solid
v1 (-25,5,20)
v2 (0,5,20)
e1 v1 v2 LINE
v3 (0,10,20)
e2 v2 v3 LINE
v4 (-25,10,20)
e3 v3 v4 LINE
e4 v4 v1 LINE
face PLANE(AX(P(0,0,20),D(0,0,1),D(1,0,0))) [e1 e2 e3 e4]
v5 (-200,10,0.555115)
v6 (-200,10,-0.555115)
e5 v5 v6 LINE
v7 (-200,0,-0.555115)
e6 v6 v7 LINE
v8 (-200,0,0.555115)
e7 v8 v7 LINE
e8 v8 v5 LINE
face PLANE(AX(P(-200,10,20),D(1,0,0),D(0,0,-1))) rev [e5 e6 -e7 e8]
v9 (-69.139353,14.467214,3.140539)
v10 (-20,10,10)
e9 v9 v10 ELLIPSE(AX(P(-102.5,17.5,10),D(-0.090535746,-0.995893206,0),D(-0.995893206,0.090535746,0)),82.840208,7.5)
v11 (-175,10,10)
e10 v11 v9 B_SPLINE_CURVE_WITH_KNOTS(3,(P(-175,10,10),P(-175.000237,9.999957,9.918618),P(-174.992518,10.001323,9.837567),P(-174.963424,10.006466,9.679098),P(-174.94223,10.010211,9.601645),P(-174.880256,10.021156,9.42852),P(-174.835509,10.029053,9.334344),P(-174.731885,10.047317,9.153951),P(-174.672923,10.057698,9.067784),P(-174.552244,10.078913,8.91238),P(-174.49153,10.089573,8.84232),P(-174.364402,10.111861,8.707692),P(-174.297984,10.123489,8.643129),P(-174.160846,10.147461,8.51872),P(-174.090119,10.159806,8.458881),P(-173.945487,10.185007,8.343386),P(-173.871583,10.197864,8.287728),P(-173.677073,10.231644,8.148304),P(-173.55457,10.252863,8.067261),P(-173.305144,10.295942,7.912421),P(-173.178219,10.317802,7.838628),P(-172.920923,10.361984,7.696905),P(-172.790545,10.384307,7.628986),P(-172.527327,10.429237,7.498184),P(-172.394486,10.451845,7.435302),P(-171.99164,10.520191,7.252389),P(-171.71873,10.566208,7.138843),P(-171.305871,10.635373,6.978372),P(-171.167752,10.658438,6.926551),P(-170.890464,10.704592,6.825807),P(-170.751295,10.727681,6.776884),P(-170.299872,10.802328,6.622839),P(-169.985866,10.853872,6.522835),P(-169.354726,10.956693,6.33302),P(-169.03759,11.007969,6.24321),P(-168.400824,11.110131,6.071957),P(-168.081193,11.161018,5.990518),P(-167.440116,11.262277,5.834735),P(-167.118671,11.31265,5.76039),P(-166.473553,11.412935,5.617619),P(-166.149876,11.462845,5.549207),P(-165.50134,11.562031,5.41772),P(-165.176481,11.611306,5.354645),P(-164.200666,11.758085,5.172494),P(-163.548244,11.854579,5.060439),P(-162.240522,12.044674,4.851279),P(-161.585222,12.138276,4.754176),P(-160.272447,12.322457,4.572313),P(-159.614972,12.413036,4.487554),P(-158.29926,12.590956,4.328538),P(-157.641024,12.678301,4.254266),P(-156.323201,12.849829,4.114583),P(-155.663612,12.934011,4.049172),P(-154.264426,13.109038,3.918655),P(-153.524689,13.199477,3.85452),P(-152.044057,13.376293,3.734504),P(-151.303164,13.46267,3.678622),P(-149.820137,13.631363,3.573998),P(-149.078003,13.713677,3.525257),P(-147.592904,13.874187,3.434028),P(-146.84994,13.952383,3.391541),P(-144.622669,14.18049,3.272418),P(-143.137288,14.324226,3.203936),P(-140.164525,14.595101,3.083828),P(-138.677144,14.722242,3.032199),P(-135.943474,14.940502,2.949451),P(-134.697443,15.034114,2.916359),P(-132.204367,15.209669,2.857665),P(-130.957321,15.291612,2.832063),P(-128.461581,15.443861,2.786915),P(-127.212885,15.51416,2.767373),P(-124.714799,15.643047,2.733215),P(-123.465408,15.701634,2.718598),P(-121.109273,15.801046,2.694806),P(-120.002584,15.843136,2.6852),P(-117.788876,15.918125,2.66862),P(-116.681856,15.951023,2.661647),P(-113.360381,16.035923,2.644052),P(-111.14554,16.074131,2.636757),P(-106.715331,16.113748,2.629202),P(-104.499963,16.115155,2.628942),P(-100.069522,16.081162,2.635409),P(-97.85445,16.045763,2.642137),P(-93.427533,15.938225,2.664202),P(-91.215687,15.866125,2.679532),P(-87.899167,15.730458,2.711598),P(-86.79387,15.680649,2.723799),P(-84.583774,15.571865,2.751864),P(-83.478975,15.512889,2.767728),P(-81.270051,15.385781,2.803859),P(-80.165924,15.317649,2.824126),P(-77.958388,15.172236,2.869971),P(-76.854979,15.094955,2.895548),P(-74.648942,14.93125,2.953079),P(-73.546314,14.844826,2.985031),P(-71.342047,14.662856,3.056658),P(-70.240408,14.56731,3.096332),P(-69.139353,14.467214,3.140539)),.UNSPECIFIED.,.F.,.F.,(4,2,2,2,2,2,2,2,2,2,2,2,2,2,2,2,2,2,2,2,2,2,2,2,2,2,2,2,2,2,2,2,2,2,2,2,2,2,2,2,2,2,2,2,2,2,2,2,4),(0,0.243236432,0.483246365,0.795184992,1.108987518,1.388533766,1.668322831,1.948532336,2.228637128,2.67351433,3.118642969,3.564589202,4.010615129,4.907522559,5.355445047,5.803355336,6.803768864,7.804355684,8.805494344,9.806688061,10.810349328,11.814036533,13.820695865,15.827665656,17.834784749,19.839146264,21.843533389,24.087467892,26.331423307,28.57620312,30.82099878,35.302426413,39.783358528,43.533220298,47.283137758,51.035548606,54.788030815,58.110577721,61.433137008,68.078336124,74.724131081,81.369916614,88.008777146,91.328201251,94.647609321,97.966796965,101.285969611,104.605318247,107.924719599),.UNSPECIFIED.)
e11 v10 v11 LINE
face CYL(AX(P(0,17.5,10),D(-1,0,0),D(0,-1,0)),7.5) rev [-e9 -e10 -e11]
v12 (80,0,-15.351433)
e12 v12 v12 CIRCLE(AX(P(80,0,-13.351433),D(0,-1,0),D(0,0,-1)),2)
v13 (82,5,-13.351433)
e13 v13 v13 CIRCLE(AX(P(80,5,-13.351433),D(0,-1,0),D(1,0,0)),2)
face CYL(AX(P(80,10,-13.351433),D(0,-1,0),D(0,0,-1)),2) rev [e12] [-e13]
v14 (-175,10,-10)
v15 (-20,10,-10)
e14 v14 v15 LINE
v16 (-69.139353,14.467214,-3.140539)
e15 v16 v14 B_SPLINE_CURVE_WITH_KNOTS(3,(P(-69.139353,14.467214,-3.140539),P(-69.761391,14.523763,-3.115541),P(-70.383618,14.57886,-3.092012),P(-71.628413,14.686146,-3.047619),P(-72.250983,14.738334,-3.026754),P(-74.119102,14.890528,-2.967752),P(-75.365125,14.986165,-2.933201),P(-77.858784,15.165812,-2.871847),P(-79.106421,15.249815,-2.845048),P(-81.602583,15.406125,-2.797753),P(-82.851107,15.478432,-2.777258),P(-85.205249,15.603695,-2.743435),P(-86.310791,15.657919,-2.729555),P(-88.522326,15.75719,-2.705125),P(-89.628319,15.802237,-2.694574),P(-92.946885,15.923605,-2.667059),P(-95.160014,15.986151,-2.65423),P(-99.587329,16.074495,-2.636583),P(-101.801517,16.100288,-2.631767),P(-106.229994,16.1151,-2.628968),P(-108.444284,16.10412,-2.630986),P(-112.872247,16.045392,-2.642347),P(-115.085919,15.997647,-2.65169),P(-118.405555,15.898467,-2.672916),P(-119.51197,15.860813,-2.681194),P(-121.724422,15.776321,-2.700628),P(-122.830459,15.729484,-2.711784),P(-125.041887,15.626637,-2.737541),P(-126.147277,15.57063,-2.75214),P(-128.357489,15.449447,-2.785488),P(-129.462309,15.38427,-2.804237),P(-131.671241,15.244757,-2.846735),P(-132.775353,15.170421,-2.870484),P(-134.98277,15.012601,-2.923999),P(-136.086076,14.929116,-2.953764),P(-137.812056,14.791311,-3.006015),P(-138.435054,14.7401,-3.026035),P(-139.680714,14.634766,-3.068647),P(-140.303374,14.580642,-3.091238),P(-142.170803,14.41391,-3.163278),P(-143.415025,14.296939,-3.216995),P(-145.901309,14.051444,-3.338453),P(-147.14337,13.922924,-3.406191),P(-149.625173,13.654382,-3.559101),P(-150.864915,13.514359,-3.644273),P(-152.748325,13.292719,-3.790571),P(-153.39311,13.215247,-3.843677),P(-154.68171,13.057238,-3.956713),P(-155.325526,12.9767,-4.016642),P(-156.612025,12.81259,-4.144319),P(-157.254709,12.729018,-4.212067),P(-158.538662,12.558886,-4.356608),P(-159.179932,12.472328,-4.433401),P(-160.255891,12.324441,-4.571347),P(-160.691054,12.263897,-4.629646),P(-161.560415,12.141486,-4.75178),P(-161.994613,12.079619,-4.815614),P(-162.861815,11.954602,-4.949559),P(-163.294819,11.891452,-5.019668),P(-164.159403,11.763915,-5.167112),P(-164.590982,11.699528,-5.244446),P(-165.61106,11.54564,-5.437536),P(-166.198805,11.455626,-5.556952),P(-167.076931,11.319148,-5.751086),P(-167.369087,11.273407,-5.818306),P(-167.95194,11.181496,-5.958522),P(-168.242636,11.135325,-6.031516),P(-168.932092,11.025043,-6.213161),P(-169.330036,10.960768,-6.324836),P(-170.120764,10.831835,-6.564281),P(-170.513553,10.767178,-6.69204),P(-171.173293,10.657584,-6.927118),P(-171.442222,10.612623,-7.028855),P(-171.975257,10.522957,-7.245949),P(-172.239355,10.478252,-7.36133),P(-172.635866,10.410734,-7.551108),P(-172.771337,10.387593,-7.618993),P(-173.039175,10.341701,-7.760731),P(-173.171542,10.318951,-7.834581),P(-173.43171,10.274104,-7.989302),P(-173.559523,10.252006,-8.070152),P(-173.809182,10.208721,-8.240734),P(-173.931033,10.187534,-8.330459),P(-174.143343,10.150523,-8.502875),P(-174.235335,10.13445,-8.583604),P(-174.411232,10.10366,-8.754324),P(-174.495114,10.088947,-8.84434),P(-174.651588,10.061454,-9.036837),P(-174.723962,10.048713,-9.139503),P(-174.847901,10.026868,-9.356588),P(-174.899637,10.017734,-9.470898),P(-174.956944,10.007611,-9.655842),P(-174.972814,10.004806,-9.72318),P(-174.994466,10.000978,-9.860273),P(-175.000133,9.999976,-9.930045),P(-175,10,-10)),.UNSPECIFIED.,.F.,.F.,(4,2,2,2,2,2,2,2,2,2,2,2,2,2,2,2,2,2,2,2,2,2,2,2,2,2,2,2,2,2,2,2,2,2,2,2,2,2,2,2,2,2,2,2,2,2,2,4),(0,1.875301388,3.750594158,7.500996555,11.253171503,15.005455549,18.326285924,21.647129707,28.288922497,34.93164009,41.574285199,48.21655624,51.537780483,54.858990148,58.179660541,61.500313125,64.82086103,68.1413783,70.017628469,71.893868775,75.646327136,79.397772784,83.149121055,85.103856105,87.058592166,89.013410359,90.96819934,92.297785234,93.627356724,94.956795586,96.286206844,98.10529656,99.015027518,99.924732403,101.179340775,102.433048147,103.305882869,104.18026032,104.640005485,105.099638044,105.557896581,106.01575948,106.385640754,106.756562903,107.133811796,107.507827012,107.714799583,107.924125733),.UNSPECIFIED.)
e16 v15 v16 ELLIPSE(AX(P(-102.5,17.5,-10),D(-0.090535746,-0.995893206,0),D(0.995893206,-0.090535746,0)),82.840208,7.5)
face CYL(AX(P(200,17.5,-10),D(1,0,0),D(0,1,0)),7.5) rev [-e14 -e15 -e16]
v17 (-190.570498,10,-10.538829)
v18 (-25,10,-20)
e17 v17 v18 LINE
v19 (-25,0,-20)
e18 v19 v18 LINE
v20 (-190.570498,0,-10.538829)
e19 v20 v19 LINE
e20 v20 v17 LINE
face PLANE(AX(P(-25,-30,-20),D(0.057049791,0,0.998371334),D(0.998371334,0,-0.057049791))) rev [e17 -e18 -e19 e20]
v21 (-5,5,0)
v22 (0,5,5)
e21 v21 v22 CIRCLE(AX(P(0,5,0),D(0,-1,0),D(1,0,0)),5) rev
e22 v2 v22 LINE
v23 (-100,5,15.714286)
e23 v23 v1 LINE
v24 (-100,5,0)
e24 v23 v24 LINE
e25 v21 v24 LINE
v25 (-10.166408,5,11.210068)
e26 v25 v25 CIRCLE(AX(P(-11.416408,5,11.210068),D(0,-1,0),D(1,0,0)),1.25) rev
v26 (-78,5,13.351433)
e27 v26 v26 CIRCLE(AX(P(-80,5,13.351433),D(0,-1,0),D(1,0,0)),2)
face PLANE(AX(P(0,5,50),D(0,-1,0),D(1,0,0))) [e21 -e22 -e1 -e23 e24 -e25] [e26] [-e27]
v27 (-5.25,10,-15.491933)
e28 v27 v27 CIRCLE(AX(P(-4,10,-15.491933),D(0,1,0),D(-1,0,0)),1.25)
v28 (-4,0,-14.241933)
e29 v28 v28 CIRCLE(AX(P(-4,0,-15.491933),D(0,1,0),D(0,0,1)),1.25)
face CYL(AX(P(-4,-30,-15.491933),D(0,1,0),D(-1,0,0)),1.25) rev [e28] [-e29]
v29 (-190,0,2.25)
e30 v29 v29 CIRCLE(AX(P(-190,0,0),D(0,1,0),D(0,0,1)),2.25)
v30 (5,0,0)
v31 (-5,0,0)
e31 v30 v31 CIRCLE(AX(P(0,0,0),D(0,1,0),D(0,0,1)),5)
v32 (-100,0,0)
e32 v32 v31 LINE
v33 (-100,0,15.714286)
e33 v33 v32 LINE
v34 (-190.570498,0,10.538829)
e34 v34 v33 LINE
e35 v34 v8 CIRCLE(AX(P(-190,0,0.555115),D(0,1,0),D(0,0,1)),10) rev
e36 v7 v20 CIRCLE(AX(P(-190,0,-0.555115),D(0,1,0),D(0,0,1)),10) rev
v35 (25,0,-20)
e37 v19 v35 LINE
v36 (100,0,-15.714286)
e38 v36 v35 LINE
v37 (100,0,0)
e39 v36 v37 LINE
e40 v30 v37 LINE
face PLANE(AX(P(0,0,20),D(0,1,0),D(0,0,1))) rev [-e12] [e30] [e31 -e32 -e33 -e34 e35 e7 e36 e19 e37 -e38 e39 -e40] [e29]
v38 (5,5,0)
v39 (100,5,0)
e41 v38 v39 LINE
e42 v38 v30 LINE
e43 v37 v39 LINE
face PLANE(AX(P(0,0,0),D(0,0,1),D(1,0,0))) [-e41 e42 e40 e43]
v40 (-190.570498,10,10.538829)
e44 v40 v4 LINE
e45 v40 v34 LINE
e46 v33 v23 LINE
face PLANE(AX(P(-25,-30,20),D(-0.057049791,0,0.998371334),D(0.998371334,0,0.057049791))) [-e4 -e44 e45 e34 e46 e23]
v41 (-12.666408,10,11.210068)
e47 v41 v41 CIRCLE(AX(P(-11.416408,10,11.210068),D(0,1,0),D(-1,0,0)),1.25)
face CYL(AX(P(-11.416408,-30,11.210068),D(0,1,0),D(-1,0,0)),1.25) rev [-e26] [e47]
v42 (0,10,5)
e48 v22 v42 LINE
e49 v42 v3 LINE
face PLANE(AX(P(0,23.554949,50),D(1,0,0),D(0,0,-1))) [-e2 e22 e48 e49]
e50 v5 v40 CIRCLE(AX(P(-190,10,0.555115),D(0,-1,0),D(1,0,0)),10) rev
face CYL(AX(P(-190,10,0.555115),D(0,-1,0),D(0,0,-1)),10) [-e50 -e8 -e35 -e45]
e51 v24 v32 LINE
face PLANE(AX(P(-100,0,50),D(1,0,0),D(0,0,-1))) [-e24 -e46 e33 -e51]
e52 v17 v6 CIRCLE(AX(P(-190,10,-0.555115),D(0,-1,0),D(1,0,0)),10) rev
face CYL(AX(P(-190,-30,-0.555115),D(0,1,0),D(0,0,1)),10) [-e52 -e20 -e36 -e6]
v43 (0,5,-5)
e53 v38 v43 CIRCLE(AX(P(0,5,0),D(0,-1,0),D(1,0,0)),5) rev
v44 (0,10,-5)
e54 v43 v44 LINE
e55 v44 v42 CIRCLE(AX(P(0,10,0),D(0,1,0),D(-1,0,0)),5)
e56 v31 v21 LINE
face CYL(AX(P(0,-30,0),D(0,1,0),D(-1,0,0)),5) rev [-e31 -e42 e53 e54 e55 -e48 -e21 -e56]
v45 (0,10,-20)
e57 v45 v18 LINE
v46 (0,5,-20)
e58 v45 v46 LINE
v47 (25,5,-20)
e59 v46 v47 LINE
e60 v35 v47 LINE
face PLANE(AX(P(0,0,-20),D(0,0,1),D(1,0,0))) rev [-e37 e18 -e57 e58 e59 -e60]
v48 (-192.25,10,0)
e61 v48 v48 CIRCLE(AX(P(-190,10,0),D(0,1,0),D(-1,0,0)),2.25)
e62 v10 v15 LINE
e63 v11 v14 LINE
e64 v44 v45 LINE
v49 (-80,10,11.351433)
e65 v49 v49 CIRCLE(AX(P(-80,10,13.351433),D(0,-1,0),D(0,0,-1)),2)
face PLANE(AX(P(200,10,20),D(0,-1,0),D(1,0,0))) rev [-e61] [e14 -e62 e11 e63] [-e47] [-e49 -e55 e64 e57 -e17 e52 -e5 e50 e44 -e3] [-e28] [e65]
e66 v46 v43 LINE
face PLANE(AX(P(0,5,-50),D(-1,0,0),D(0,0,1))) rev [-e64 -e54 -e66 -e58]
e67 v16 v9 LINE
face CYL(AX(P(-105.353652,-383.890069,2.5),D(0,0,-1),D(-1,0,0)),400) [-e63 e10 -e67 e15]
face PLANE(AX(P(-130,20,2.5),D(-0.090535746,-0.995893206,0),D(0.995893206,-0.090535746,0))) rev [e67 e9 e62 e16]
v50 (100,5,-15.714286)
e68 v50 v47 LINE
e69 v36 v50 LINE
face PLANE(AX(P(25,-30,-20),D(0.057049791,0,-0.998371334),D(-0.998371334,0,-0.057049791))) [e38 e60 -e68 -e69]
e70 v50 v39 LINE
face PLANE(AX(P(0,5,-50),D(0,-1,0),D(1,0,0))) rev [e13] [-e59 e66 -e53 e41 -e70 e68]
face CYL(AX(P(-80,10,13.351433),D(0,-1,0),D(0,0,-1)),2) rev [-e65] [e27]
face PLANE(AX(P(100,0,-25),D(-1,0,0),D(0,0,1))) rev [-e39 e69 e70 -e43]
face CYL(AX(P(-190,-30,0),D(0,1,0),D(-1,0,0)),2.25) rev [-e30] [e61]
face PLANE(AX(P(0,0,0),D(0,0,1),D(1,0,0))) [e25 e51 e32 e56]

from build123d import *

# Parameters (mm, degrees)
BOSS_EXTRUDE1_DEPTH  = 20
SKETCH3_R            = 1.25
SKETCH3_R_2          = 5
SKETCH3_R_3          = 2.25
CUT_EXTRUDE1_DEPTH   = 40
CUT_EXTRUDE2_DEPTH   = 40
MIRROR2_COPY_1_DEPTH = 40
BOSS_EXTRUDE3_DEPTH  = 2.5
SKETCH6_W            = 107.318523781
SKETCH6_H            = 36.59372062
CUT_EXTRUDE3_DEPTH   = 25
SKETCH7_W            = 103.85031415
SKETCH7_H            = 15.718097745
CUT_EXTRUDE4_DEPTH   = 50
SKETCH8_W            = 102.493521885
SKETCH8_H            = 23.554949116
CUT_EXTRUDE5_DEPTH   = 50
SKETCH9_W            = 100
SKETCH9_H            = 5
CUT_EXTRUDE6_DEPTH   = 50
FILLET1_R            = 400
FILLET2_R            = 10
FILLET3_START        = -2.629939755
FILLET3_DEPTH        = 5.259872573
FILLET3_START_2      = -10.0000001
FILLET3_2_DEPTH      = 20.0000001
FILLET3_START_3      = -176
FILLET3_3_DEPTH      = 156
SKETCH10_R           = 2
CUT_EXTRUDE7_DEPTH   = 10


with BuildPart() as part:
    # Sketch2 → Boss-Extrude1 (new, symmetric)
    with BuildSketch(Plane.XY):
        Polygon((0, 0), (200, 0), (200, 10), (-200, 10), (-200, 0), align=None)
    extrude(amount=BOSS_EXTRUDE1_DEPTH, both=True)

    # Sketch3 → Cut-Extrude1 (cut)
    with BuildSketch(Plane(origin=(0, 10, 0), x_dir=(1, 0, 0), z_dir=(0, 1, 0))):
        with Locations(Location((-4, 15.491933385, 0), (0, 0, 180))):
            Circle(SKETCH3_R)
        with Locations(Location((15.416407865, -4.281865077, 0), (0, 0, 180))):
            Circle(SKETCH3_R)
        with Locations(Location((-11.416407865, -11.210068308, 0), (0, 0, 180))):
            Circle(SKETCH3_R)
        with Locations(Location((0, 0, 0), (0, 0, 180))):
            Circle(SKETCH3_R_2)
        with Locations(Location((-190, 0, 0), (0, 0, 180))):
            Circle(SKETCH3_R_3)
        with Locations(Location((190, 0, 0), (0, 0, 270))):
            Circle(SKETCH3_R_3)
    extrude(amount=-CUT_EXTRUDE1_DEPTH, mode=Mode.SUBTRACT)

    # Sketch4 → Cut-Extrude2 (cut)
    with BuildSketch(Plane(origin=(0, 10, 0), x_dir=(1, 0, 0), z_dir=(0, 1, 0))):
        Polygon((-205.682411406, 30.266574236), (-25, 30.266574236), (-25, 20), (-200, 10), (-205.682411406, 10), align=None)
    cut_extrude2 = extrude(amount=-CUT_EXTRUDE2_DEPTH, mode=Mode.SUBTRACT)

    # Mirror1: Cut-Extrude2 across plane
    add(cut_extrude2.mirror(Plane(origin=(0, 0, 0), x_dir=(0, 0, 1), z_dir=(1, 0, 0))), mode=Mode.SUBTRACT)

    # Mirror2: Cut-Extrude2 across plane
    add(cut_extrude2.mirror(Plane.XY), mode=Mode.SUBTRACT)

    # Mirror2 copy 1 sketch → Mirror2 copy 1 (cut)
    with BuildSketch(Plane(origin=(0, 10, 0), x_dir=(-1, 0, 0), z_dir=(0, 1, 0))):
        Polygon((-205.682411406, 30.266574236), (-25, 30.266574236), (-25, 20), (-200, 10), (-205.682411406, 10), align=None)
    extrude(amount=-MIRROR2_COPY_1_DEPTH, mode=Mode.SUBTRACT)

    # Sketch5 → Boss-Extrude3 (add, symmetric)
    with BuildSketch(Plane.XY):
        Polygon((-175, 10), (-20, 10), (-130, 20), align=None)
    boss_extrude3 = extrude(amount=BOSS_EXTRUDE3_DEPTH, both=True)

    # Mirror3: Boss-Extrude3 across plane
    add(boss_extrude3.mirror(Plane(origin=(0, 0, 0), x_dir=(0, 0, 1), z_dir=(1, 0, 0))))

    # Sketch6 → Cut-Extrude3 (cut, symmetric)
    with BuildSketch(Plane.XY):
        with Locations((153.659261891, 18.29686031)):
            Rectangle(SKETCH6_W, SKETCH6_H)
    extrude(amount=CUT_EXTRUDE3_DEPTH, both=True, mode=Mode.SUBTRACT)

    # Sketch7 → Cut-Extrude4 (cut)
    with BuildSketch(Plane.XY):
        with Locations((51.925157075, 12.859048873)):
            Rectangle(SKETCH7_W, SKETCH7_H)
    extrude(amount=-CUT_EXTRUDE4_DEPTH, mode=Mode.SUBTRACT)

    # Sketch8 → Cut-Extrude5 (cut)
    with BuildSketch(Plane.XY):
        with Locations((51.246760943, 11.777474558)):
            Rectangle(SKETCH8_W, SKETCH8_H)
    extrude(amount=CUT_EXTRUDE5_DEPTH, mode=Mode.SUBTRACT)

    # Sketch9 → Cut-Extrude6 (cut)
    with BuildSketch(Plane.XY):
        with Locations((-50, 2.5)):
            Rectangle(SKETCH9_W, SKETCH9_H)
    extrude(amount=CUT_EXTRUDE6_DEPTH, mode=Mode.SUBTRACT)

    # Fillet1
    # the kernel refuses this fillet: 400 mm, written as the material it takes off along each edge
    with BuildSketch(Plane(origin=(-130, 20, 155.27904863), x_dir=(-0.9761870601839527, -0.21693045781865625, 0), z_dir=(0, 0, -1))) as fillet1_piece_1:
        with BuildLine():
            CenterArc((63.556611275, -399.618802355), FILLET1_R, 92.501596354, 15.221640262)
            Line((-58.21114592, -18.603562098), (-60.646501064, -10.983257293))
            Line((-60.646501064, -10.983257293), (-2.435355144, 7.620304805))
            Line((-2.435355144, 7.620304805), (0, 8))
            ThreePointArc((0, 8), (23.048861143, 8), (45.748544507, 7.992376047))
            Line((45.748544507, 7.992376047), (46.097722286, 0))
        make_face()
    extrude(amount=310.558097261, mode=Mode.SUBTRACT)

    # Fillet2
    fillet2_edges = [part.edges().sort_by_distance(p)[0] for p in [
        (-200, 5, -10),
        (-200, 5, 10),
    ]]
    fillet(fillet2_edges, radius=FILLET2_R)

    # Fillet3: read off the stored shape, not the designer's step
    # Fillet3 outline → Fillet3 (add)
    with BuildSketch(Plane.XY.offset(FILLET3_START)):
        with BuildLine():
            Line((-20, 10), (-69.139353351, 14.467213941))
            ThreePointArc((-69.139353351, 14.467213941), (-122.218339331, 15.75425111), (-175.000186885, 9.999966956))
            Line((-175.000186885, 9.999966956), (-20, 10))
        make_face()
    extrude(amount=FILLET3_DEPTH)

    # Fillet3 2 outline → Fillet3 2 (add)
    with BuildSketch(Plane.XY.offset(FILLET3_START_2)):
        with BuildLine():
            Line((-20, 10), (-69.139353351, 14.467213941))
            ThreePointArc((-69.139353351, 14.467213941), (-122.218339331, 15.75425111), (-175.000186885, 9.999966956))
            Line((-175.000186885, 9.999966956), (-20, 10))
        make_face()
    extrude(amount=FILLET3_2_DEPTH)

    # Fillet3 3 outline → Fillet3 3 (cut)
    with BuildSketch(Plane.YZ.offset(FILLET3_START_3)):
        with BuildLine():
            ThreePointArc((10, 10), (11.726129638, 5.213307923), (16.109978945, 2.629936129))
            Line((16.109978945, 2.629936129), (18, 2.273471232))
            Line((18, 2.273471232), (18, 10))
            Line((18, 10), (10, 10))
        make_face()
        with BuildLine():
            Line((18, -10.0000001), (18, -2.273470992))
            Line((18, -2.273470992), (16.109978046, -2.629936298))
            ThreePointArc((16.109978046, -2.629936298), (11.726129346, -5.213308275), (10, -10))
            Line((10, -10), (18, -10.0000001))
        make_face()
    extrude(amount=FILLET3_3_DEPTH, mode=Mode.SUBTRACT)

    # Sketch10 → Cut-Extrude7 (cut)
    with BuildSketch(Plane.XZ):
        with Locations(Location((-80, 13.351433229, 0), (0, 0, 270))):
            Circle(SKETCH10_R)
        with Locations(Location((80, -13.351433229, 0), (0, 0, 270))):
            Circle(SKETCH10_R)
    extrude(amount=-CUT_EXTRUDE7_DEPTH, mode=Mode.SUBTRACT)


solid = part.part
